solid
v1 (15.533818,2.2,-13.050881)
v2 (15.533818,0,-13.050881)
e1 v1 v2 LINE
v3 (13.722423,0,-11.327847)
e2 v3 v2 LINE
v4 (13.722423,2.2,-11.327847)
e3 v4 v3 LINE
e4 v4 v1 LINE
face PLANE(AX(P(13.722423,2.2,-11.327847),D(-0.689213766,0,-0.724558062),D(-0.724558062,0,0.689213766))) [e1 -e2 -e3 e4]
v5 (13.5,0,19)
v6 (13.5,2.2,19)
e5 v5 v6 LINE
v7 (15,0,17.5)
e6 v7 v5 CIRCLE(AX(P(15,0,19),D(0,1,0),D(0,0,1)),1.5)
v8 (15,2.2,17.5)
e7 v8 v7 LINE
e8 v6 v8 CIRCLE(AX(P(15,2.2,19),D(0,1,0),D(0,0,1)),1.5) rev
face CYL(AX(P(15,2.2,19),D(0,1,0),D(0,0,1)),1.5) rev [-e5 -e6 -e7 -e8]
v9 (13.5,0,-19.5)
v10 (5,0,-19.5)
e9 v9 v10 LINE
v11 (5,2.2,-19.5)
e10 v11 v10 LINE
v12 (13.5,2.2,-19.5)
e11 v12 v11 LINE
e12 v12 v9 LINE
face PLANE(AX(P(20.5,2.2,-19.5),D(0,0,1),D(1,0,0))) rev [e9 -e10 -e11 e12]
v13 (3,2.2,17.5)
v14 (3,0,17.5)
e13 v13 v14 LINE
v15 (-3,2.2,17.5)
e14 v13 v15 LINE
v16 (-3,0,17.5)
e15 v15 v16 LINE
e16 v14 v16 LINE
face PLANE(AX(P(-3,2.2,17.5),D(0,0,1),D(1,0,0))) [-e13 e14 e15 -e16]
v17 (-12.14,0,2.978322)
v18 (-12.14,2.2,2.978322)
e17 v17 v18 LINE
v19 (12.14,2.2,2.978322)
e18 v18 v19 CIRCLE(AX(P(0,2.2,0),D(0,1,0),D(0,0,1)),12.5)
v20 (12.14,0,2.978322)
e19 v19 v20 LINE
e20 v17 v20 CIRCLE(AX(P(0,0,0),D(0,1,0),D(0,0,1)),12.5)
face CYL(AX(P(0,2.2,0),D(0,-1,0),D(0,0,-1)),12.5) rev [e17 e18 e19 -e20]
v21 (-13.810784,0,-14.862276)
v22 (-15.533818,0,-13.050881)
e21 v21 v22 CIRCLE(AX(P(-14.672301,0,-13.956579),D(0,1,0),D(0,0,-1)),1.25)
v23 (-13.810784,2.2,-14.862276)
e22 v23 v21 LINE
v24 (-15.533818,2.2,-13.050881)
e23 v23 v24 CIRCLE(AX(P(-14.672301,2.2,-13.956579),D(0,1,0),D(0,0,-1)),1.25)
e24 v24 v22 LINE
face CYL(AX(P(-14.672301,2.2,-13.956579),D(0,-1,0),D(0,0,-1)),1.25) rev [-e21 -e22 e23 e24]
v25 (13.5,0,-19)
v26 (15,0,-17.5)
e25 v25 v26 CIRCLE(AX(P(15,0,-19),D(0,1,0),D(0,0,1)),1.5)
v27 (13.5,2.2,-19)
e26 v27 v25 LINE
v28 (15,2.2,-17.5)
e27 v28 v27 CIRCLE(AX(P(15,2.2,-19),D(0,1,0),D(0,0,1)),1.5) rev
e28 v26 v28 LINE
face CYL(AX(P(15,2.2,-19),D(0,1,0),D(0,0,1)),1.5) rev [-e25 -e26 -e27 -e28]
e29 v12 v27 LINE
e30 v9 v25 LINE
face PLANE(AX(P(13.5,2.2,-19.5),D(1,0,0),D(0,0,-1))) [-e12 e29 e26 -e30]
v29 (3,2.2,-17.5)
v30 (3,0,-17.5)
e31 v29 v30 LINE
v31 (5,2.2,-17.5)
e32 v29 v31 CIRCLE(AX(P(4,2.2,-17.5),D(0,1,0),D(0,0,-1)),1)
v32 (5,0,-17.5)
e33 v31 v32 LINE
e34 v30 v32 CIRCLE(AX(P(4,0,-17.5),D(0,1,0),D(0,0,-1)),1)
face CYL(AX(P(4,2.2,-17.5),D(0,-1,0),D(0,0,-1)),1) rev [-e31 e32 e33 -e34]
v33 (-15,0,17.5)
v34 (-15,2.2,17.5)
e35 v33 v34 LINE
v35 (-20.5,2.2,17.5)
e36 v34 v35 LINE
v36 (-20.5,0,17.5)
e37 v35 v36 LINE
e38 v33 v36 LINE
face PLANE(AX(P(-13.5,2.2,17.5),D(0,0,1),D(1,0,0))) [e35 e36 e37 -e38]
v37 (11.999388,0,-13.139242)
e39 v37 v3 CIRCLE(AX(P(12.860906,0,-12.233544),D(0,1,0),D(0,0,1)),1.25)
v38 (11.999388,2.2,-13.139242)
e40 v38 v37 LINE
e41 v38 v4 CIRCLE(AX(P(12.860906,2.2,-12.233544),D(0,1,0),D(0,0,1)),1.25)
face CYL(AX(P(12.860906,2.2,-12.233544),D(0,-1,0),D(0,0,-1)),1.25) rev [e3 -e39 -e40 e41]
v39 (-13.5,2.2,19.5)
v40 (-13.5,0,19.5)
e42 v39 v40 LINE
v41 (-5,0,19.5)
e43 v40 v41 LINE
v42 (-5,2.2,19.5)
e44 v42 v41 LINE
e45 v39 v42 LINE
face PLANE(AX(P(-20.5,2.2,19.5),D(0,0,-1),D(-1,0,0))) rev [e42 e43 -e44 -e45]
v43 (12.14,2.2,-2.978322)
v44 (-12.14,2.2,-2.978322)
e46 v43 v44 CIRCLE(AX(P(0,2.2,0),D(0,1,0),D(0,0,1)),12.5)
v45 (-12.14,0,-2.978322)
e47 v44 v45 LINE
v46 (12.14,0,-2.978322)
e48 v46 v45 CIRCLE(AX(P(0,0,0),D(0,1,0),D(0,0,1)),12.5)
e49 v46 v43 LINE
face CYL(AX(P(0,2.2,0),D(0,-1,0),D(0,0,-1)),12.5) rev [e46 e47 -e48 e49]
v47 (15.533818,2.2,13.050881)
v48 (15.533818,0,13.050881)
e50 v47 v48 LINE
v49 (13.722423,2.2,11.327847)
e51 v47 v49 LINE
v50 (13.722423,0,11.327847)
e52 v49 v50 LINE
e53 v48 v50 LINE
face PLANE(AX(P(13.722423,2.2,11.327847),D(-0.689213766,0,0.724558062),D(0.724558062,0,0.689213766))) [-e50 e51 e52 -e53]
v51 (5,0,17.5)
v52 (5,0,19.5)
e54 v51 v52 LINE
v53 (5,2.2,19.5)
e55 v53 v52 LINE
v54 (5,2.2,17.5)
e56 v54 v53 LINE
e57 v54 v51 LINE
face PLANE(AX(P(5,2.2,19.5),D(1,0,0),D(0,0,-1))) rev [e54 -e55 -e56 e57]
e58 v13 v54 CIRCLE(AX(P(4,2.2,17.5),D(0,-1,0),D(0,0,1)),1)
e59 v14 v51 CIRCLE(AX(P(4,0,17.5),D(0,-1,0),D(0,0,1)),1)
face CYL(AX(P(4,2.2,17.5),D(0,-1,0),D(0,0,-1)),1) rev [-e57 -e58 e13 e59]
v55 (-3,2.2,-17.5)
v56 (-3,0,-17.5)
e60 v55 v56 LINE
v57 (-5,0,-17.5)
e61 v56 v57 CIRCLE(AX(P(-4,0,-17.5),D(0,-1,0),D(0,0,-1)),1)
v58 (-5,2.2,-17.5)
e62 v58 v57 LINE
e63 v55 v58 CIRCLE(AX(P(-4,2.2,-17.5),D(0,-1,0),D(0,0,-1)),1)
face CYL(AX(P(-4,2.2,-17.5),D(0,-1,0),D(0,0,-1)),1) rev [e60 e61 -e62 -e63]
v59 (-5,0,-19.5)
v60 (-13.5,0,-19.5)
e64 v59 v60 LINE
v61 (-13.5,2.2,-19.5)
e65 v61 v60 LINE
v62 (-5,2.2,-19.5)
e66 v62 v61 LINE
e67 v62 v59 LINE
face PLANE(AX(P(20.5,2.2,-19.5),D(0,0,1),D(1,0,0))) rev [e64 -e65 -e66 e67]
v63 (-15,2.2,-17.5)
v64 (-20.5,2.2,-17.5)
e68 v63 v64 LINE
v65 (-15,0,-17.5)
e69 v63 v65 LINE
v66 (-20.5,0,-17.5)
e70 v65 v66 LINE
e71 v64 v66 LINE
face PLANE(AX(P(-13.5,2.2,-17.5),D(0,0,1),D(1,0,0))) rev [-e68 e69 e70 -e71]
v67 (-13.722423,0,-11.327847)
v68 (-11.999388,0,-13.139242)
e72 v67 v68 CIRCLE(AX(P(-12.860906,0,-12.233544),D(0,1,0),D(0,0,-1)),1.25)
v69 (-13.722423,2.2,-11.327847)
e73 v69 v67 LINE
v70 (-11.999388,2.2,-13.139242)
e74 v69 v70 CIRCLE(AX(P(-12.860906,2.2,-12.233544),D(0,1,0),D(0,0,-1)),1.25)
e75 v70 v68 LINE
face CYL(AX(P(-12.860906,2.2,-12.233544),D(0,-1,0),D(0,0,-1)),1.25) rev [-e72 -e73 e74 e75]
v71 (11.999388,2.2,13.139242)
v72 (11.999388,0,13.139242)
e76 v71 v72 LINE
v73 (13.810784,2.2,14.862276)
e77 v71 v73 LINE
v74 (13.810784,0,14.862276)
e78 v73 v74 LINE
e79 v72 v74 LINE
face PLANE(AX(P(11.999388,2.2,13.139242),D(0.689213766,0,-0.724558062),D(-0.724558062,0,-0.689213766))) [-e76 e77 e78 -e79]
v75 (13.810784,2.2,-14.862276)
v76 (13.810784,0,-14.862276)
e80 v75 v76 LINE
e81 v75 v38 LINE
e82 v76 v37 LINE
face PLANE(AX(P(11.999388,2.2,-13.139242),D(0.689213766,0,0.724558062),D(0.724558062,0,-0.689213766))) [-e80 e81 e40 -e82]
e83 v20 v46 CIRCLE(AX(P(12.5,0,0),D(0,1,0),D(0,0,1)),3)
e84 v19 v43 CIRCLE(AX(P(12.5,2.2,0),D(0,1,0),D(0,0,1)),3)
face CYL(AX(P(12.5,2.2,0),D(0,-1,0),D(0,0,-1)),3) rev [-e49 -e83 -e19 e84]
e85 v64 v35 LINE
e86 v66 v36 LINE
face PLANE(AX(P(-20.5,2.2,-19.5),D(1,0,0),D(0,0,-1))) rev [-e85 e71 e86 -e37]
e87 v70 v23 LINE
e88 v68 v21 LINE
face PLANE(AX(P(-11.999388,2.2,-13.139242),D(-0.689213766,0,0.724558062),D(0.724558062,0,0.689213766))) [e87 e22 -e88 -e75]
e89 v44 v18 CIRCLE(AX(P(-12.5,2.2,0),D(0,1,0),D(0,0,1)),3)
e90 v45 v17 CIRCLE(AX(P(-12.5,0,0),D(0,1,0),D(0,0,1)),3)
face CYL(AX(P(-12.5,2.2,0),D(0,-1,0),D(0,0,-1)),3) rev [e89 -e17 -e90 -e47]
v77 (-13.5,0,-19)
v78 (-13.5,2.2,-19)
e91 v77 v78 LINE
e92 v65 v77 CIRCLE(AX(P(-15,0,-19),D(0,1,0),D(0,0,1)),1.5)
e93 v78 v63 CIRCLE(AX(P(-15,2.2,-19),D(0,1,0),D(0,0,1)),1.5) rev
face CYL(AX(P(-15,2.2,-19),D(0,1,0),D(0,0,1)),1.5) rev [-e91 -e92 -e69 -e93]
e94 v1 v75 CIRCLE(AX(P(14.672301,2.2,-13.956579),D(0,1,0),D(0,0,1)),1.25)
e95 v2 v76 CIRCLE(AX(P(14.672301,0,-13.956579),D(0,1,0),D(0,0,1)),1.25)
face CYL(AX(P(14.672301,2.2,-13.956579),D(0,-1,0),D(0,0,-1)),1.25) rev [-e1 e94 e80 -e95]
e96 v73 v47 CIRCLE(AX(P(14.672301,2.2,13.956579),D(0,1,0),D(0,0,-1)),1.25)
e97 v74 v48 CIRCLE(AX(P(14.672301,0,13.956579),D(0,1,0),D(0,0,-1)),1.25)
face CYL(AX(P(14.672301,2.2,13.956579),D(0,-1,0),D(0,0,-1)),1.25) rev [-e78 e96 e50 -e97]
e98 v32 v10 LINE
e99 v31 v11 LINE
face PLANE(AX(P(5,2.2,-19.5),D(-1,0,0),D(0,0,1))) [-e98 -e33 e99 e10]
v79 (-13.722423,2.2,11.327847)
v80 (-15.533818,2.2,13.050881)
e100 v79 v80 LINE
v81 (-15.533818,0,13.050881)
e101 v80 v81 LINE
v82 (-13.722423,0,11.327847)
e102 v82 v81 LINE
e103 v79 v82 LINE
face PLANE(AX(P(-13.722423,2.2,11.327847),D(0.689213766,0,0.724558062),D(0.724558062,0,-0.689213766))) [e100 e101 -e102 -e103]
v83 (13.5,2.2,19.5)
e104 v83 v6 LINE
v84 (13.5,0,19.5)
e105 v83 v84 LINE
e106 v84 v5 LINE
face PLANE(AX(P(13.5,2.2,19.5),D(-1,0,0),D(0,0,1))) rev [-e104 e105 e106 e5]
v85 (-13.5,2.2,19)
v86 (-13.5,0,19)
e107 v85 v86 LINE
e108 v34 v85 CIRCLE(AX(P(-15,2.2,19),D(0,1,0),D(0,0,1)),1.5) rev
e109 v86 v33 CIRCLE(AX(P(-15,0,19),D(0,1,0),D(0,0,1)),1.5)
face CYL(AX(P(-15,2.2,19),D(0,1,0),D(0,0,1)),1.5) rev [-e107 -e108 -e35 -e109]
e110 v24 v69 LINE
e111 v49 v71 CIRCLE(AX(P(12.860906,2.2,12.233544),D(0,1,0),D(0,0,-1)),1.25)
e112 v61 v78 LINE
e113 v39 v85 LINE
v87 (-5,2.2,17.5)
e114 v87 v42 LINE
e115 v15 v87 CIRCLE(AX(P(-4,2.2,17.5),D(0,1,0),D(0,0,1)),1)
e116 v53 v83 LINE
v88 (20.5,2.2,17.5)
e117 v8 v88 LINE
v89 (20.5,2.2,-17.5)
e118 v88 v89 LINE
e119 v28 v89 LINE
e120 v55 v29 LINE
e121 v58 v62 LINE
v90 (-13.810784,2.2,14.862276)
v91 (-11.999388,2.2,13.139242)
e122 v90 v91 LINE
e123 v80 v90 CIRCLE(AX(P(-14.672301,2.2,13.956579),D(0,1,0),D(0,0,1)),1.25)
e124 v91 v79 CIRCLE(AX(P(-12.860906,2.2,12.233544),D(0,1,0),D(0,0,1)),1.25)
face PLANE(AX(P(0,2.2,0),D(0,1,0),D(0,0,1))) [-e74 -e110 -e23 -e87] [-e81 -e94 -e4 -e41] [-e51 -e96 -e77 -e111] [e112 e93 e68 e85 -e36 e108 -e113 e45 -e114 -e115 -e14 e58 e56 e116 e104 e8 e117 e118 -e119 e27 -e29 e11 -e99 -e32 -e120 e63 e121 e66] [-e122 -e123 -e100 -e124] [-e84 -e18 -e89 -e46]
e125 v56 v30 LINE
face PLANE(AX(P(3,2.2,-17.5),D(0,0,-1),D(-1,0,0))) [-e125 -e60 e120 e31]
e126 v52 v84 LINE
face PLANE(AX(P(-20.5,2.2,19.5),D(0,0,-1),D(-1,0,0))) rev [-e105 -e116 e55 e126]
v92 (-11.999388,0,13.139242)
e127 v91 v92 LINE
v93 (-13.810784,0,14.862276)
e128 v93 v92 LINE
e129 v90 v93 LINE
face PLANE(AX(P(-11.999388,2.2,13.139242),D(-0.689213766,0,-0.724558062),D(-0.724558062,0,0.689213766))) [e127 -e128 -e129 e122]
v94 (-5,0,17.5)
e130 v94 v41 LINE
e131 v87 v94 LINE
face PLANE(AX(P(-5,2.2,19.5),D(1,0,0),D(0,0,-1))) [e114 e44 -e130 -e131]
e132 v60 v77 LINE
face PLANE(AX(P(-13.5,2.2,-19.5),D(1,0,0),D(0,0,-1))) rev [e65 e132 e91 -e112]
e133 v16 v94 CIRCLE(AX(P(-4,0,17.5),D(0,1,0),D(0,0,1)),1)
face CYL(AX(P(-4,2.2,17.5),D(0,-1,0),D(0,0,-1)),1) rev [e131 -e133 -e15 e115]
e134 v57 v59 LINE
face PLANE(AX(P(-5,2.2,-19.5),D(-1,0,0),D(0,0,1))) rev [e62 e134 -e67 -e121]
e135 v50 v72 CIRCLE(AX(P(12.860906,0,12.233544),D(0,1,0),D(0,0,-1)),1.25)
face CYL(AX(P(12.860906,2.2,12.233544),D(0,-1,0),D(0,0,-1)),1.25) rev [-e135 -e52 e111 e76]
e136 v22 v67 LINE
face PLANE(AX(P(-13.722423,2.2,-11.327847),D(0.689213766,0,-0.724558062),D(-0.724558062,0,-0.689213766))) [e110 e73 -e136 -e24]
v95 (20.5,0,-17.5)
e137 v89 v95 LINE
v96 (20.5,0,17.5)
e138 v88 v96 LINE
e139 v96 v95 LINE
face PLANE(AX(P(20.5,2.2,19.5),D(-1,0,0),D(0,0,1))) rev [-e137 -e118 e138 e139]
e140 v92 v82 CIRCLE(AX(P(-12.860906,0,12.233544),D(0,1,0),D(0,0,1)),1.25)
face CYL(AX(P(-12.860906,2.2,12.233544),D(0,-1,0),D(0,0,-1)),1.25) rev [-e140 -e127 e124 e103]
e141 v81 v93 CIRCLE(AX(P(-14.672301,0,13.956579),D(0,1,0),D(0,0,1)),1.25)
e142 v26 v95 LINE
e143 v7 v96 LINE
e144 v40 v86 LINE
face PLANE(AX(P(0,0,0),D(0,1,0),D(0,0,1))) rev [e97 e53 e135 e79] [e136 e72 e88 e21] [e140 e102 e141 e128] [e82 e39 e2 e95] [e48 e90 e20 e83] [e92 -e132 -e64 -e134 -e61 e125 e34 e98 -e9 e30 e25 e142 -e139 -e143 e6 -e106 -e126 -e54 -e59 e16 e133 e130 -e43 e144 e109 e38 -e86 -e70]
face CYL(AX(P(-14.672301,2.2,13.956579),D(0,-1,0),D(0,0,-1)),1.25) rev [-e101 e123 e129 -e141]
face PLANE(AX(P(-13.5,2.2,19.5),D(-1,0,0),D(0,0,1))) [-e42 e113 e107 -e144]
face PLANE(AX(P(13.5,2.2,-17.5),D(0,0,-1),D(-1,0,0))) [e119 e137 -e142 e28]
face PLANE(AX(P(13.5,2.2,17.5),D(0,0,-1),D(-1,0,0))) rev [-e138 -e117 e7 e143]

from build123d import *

# Parameters (mm, degrees)
SKETCH1_W            = 41
SKETCH1_H            = 39
BOSS_EXTRUDE1_DEPTH  = 2.2
SKETCH2_R            = 12.5
CUT_EXTRUDE1_DEPTH   = 29.378512998
SKETCH3_R            = 3
CUT_EXTRUDE2_DEPTH   = 29.378512998
SKETCH4_W            = 7
SKETCH4_H            = 2
CUT_EXTRUDE3_DEPTH   = 29.378512998
FILLET1_R            = 1.5
FILLET1_OF_MIRROR1_R = 1.5
MIRROR3_DEPTH        = 2.2


# Read off the part's stored shape, not the designer's step: Mirror3
with BuildPart() as part:
    # Sketch1 → Boss-Extrude1 (new body)
    with BuildSketch(Plane(origin=(0, 0, 0), x_dir=(1, 0, 0), z_dir=(0, 1, 0))):
        Rectangle(SKETCH1_W, SKETCH1_H)
    extrude(amount=BOSS_EXTRUDE1_DEPTH)

    # Sketch2 → Cut-Extrude1 (cut, through all)
    with BuildSketch(Plane(origin=(0, 0, 0), x_dir=(1, 0, 0), z_dir=(0, 1, 0))):
        with Locations(Location((0, 0, 0), (0, 0, 270))):
            Circle(SKETCH2_R)
    extrude(amount=CUT_EXTRUDE1_DEPTH, mode=Mode.SUBTRACT)

    # Sketch3 → Cut-Extrude2 (cut, through all)
    with BuildSketch(Plane(origin=(0, 0, 0), x_dir=(1, 0, 0), z_dir=(0, 1, 0))):
        with Locations((12.5, 0)):
            Circle(SKETCH3_R)
        with Locations((-12.5, 0)):
            Circle(SKETCH3_R)
        with BuildLine():
            Line((11.999388387, 13.139241924), (13.810783542, 14.862276339))
            ThreePointArc((13.810783542, 14.862276339), (15.577998326, 14.818095969), (15.533817957, 13.050881184))
            Line((15.533817957, 13.050881184), (13.722422802, 11.327846769))
            ThreePointArc((13.722422802, 11.327846769), (11.955208018, 11.372027139), (11.999388387, 13.139241924))
        make_face()
        with BuildLine():
            Line((11.999388387, -13.139241924), (13.810783542, -14.862276339))
            ThreePointArc((13.810783542, -14.862276339), (15.577998326, -14.818095969), (15.533817957, -13.050881184))
            Line((15.533817957, -13.050881184), (13.722422802, -11.327846769))
            ThreePointArc((13.722422802, -11.327846769), (11.955208018, -11.372027139), (11.999388387, -13.139241924))
        make_face()
        with BuildLine():
            Line((-11.999388387, -13.139241924), (-13.810783542, -14.862276339))
            ThreePointArc((-13.810783542, -14.862276339), (-15.577998326, -14.818095969), (-15.533817957, -13.050881184))
            Line((-15.533817957, -13.050881184), (-13.722422802, -11.327846769))
            ThreePointArc((-13.722422802, -11.327846769), (-11.955208018, -11.372027139), (-11.999388387, -13.139241924))
        make_face()
        with BuildLine():
            Line((-11.999388387, 13.139241924), (-13.810783542, 14.862276339))
            ThreePointArc((-13.810783542, 14.862276339), (-15.577998326, 14.818095969), (-15.533817957, 13.050881184))
            Line((-15.533817957, 13.050881184), (-13.722422802, 11.327846769))
            ThreePointArc((-13.722422802, 11.327846769), (-11.955208018, 11.372027139), (-11.999388387, 13.139241924))
        make_face()
    extrude(amount=CUT_EXTRUDE2_DEPTH, mode=Mode.SUBTRACT)

    # Sketch4 → Cut-Extrude3 (cut, through all)
    with BuildSketch(Plane(origin=(0, 0, 0), x_dir=(1, 0, 0), z_dir=(0, 1, 0))):
        with Locations((17, 18.5)):
            Rectangle(SKETCH4_W, SKETCH4_H)
        with BuildLine():
            Line((0, 19.5), (5, 19.5))
            Line((5, 19.5), (5, 17.5))
            ThreePointArc((5, 17.5), (4, 16.5), (3, 17.5))
            Line((3, 17.5), (0, 17.5))
            Line((0, 17.5), (0, 19.5))
        make_face()
    cut_extrude3 = extrude(amount=CUT_EXTRUDE3_DEPTH, mode=Mode.SUBTRACT)

    # Fillet1
    fillet1_edges = [part.edges().sort_by_distance(p)[0] for p in [
        (13.5, 1.1, -17.5),
    ]]
    fillet(fillet1_edges, radius=FILLET1_R)

    # Mirror1: Cut-Extrude3 across plane
    add(cut_extrude3.mirror(Plane(origin=(0, 0, 0), x_dir=(0, 0, 1), z_dir=(1, 0, 0))), mode=Mode.SUBTRACT)

    # Fillet1 of Mirror1
    fillet1_of_mirror1_edges = [part.edges().sort_by_distance(p)[0] for p in [
        (-13.5, 1.1, -17.5),
    ]]
    fillet(fillet1_of_mirror1_edges, radius=FILLET1_OF_MIRROR1_R)

    # Mirror3 outline → Mirror3 (cut)
    with BuildSketch(Plane(origin=(0, 0, 0), x_dir=(1, 0, 0), z_dir=(0, 1, 0))):
        with BuildLine():
            Line((-5, -19.5), (5, -19.5))
            Line((5, -19.5), (5, -17.5))
            ThreePointArc((5, -17.5), (4, -16.5), (3, -17.5))
            Line((3, -17.5), (-3, -17.5))
            ThreePointArc((-3, -17.5), (-4, -16.5), (-5, -17.5))
            Line((-5, -17.5), (-5, -19.5))
        make_face()
        with BuildLine():
            Line((13.5, -19), (13.5, -19.5))
            Line((13.5, -19.5), (20.5, -19.5))
            Line((20.5, -19.5), (20.5, -17.5))
            Line((20.5, -17.5), (15, -17.5))
            ThreePointArc((15, -17.5), (13.939339828, -17.939339828), (13.5, -19))
        make_face()
        with BuildLine():
            Line((-20.5, -19.5), (-13.5, -19.5))
            Line((-13.5, -19.5), (-13.5, -19))
            ThreePointArc((-13.5, -19), (-13.939339828, -17.939339828), (-15, -17.5))
            Line((-15, -17.5), (-20.5, -17.5))
            Line((-20.5, -17.5), (-20.5, -19.5))
        make_face()
    extrude(amount=MIRROR3_DEPTH, mode=Mode.SUBTRACT)


solid = part.part
